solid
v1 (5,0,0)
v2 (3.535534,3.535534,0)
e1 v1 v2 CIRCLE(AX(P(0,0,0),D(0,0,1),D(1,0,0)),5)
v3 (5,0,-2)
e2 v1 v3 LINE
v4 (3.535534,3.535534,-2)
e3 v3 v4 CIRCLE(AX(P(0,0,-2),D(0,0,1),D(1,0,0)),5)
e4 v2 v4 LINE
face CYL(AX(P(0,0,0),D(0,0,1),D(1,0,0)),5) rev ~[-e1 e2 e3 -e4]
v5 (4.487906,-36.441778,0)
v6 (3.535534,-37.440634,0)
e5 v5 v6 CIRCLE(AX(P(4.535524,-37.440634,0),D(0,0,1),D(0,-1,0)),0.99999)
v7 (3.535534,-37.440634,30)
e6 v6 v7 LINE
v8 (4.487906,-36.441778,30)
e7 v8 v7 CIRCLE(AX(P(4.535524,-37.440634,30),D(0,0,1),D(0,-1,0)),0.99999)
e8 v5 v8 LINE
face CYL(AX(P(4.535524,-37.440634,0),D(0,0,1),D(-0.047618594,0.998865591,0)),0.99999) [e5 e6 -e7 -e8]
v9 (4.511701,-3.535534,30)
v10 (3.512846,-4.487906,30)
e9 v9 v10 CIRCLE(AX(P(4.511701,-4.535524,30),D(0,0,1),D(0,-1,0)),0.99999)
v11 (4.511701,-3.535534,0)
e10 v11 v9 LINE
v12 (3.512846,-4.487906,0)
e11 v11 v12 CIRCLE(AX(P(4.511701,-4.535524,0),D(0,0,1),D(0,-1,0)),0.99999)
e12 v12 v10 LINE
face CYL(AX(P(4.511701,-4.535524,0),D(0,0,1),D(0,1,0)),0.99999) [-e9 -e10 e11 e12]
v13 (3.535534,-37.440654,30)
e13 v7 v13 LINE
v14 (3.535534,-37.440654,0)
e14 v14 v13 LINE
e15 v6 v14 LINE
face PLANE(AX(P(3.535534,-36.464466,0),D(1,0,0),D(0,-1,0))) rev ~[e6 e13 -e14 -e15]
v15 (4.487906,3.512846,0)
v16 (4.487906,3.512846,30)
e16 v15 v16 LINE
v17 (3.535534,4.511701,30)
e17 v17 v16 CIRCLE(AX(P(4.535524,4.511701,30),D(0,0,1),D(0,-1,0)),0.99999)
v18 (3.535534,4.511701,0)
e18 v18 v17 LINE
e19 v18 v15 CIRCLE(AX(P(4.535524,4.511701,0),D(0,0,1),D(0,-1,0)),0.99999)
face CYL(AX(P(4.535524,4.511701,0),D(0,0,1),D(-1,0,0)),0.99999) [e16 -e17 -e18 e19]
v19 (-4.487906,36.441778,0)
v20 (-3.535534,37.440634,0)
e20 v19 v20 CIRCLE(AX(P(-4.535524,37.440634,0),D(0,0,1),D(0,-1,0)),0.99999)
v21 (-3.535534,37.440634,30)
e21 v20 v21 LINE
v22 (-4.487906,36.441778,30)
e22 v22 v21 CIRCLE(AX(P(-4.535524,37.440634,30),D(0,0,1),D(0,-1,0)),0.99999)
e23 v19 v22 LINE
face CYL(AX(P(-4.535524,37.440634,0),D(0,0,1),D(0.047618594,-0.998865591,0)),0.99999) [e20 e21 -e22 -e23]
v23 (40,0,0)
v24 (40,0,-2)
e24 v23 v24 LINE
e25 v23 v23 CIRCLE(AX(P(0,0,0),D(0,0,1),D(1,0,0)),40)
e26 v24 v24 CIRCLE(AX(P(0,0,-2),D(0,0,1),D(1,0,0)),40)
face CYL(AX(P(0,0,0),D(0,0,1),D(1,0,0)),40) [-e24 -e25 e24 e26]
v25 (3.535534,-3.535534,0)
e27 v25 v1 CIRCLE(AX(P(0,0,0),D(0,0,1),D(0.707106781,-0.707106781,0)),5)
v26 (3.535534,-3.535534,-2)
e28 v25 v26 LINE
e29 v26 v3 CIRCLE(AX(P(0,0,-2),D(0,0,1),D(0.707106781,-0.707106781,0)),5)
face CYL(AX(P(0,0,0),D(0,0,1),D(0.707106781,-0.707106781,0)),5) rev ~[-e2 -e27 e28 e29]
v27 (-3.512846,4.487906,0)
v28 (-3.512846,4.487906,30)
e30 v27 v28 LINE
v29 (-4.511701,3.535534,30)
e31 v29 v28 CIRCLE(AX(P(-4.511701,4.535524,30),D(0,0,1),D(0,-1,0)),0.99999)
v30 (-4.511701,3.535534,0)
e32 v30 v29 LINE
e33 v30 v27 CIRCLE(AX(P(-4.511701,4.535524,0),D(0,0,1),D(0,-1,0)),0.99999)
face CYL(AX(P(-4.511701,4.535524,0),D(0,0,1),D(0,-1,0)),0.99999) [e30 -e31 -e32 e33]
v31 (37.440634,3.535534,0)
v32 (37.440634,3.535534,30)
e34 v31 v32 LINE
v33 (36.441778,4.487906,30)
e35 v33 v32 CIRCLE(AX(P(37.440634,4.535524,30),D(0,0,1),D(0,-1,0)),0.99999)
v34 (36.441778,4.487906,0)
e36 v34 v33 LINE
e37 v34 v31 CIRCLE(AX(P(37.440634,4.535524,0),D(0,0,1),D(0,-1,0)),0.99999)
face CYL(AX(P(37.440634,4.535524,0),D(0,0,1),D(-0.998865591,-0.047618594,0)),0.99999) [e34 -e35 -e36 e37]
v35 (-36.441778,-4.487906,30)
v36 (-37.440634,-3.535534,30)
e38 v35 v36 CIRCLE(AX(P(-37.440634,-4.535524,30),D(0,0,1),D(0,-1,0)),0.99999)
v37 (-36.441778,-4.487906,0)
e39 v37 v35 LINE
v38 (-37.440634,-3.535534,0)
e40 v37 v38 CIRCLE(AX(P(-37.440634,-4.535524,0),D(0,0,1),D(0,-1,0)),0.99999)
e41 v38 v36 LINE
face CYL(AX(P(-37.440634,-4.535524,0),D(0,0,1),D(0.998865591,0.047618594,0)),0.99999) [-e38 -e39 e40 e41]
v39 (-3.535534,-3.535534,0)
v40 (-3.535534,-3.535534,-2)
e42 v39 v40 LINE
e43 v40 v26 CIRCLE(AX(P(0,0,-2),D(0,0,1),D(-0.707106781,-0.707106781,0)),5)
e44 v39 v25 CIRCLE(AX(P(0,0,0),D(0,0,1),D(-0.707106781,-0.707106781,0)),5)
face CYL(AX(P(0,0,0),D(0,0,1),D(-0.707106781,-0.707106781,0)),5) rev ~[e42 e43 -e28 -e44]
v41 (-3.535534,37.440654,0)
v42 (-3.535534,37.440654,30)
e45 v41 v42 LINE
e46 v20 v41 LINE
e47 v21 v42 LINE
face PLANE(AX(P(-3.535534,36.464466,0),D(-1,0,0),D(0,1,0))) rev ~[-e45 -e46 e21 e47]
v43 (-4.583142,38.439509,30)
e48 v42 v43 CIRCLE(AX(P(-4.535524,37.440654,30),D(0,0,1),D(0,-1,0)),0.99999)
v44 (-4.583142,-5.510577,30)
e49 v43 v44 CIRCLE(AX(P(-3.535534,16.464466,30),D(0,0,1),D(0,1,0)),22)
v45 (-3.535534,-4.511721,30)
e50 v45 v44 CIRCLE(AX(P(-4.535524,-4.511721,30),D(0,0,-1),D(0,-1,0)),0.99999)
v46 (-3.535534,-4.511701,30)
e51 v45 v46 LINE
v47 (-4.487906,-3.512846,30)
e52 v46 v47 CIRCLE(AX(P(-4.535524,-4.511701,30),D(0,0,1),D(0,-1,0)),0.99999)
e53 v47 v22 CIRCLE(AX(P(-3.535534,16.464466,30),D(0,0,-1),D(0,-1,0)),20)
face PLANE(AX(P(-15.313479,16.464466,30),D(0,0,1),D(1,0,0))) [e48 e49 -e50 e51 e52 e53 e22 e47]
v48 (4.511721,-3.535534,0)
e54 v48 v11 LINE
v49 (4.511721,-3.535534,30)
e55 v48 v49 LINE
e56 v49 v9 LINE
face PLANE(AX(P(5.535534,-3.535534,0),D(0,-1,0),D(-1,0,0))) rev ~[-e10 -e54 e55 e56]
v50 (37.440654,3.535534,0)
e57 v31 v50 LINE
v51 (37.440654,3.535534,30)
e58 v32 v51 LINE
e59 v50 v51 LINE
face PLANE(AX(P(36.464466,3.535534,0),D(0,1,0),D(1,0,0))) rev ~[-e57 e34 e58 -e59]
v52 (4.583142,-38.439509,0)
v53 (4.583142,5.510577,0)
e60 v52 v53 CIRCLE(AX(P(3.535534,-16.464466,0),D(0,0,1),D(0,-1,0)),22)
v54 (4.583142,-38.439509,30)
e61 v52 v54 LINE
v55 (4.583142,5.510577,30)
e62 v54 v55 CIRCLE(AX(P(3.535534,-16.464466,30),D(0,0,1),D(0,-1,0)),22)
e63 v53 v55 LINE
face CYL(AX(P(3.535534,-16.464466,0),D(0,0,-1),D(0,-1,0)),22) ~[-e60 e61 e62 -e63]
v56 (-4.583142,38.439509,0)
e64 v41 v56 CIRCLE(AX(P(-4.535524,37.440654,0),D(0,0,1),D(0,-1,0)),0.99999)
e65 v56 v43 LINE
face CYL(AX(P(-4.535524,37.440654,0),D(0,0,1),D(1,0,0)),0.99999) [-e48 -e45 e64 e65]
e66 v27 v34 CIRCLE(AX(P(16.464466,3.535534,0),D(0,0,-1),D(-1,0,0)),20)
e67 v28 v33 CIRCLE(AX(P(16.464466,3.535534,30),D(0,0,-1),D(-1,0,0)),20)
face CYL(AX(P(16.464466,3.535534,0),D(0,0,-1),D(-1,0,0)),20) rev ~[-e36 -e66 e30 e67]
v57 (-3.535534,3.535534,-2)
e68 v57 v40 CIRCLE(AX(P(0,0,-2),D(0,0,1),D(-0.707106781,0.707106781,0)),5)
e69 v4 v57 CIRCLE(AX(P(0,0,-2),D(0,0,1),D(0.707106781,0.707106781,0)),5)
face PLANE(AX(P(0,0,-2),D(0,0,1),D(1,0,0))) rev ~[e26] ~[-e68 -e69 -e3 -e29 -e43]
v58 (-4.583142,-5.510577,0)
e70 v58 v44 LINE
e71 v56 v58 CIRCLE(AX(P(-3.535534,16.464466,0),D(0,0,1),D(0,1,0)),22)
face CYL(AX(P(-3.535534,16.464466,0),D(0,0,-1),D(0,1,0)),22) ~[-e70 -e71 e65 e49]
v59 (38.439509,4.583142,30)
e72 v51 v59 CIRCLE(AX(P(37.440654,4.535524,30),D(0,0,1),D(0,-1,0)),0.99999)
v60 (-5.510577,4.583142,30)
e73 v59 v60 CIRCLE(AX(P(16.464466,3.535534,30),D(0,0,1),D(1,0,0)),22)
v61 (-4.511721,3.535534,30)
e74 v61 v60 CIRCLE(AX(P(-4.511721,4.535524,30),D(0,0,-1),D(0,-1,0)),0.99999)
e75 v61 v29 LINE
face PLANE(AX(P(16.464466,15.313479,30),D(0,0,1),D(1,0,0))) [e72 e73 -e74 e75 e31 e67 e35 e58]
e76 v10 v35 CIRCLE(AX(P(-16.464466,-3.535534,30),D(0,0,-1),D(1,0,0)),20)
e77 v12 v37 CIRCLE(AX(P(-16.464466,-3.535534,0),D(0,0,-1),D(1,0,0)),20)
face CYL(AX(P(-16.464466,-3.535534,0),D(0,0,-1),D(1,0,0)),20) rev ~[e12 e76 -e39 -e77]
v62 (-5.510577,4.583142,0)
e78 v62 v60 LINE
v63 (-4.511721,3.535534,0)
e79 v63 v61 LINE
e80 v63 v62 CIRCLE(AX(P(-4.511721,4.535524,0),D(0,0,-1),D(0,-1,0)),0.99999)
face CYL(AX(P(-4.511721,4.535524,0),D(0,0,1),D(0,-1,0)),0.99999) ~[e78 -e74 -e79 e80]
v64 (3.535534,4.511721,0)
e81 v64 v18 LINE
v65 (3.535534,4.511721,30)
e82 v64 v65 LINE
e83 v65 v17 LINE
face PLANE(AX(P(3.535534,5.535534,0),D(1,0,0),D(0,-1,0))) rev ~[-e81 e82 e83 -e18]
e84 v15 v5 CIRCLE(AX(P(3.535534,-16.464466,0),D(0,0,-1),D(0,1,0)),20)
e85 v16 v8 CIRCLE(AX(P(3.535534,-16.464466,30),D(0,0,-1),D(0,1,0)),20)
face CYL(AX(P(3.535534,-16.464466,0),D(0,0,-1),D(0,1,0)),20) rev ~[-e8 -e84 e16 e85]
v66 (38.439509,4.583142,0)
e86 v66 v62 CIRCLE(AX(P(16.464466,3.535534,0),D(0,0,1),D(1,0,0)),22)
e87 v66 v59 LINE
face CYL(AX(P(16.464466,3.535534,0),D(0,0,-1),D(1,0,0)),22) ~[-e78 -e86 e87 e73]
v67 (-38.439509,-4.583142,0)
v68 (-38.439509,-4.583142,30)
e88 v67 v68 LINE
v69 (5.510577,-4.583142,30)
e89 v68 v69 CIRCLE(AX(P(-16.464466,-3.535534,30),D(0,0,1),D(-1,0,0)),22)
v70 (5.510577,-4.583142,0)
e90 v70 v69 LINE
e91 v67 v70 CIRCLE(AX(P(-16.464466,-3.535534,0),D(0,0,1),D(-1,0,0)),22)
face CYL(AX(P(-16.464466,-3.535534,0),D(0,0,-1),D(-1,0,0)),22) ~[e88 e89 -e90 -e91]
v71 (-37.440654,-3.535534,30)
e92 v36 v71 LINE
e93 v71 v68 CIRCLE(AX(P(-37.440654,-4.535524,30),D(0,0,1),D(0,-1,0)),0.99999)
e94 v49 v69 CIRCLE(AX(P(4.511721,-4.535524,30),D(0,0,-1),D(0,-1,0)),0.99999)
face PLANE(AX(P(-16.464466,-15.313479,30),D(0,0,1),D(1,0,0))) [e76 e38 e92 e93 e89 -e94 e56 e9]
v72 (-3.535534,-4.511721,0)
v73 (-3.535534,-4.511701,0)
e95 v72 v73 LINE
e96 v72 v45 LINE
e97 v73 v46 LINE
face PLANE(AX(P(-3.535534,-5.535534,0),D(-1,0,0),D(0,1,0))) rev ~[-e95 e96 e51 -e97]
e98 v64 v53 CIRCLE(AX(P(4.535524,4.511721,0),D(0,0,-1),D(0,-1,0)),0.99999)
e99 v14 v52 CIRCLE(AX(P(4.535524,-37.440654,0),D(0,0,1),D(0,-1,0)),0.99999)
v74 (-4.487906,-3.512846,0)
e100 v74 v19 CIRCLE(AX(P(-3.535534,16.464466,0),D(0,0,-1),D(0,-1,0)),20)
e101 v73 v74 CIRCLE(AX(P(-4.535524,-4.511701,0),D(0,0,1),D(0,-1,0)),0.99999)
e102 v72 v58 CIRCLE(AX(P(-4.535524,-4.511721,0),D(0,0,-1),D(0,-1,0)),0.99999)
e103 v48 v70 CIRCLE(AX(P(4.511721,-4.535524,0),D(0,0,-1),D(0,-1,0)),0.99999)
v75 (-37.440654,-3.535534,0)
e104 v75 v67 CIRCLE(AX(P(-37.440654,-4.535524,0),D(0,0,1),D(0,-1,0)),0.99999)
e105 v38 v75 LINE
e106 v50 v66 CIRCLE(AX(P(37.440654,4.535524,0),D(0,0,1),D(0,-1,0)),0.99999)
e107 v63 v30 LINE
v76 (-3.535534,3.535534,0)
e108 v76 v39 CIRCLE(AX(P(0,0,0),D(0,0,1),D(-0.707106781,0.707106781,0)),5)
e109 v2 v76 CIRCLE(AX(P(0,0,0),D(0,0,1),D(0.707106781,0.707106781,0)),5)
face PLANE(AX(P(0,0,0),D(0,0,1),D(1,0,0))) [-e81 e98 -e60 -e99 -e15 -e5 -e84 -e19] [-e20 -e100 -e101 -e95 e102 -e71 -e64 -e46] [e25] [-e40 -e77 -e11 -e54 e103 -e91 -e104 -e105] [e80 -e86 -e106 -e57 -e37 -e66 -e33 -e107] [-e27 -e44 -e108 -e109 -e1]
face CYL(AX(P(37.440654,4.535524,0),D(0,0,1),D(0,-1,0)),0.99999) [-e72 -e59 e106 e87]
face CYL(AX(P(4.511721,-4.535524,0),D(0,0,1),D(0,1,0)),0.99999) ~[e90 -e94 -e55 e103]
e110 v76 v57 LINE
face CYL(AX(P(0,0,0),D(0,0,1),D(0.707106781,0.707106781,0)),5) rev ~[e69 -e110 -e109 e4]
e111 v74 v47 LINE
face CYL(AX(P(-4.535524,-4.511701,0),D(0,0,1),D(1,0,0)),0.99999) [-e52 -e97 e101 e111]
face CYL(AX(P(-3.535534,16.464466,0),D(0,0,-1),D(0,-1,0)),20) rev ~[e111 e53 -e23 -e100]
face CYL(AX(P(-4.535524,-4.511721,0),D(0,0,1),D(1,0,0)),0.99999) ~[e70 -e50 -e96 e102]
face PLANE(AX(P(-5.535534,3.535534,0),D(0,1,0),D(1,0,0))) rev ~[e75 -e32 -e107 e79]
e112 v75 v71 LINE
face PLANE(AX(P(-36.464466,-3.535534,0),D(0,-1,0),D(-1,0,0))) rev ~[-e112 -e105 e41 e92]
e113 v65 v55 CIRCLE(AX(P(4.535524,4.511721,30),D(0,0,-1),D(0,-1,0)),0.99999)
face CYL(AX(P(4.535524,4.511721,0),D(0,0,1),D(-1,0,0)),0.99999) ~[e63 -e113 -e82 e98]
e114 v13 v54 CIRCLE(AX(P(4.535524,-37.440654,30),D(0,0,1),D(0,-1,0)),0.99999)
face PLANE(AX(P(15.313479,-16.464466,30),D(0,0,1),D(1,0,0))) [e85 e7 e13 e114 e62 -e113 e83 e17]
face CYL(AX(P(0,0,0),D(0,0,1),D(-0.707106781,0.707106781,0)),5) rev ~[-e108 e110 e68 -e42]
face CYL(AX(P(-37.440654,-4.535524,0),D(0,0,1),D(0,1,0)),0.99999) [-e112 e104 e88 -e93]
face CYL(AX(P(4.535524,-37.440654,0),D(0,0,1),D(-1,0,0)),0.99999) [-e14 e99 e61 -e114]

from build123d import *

# Parameters (mm, degrees)
F1_DEPTH = 30
F2_R     = 0.99999
F2_2_R   = 0.99999
F2_3_R   = 0.99999
F2_4_R   = 0.99999
F3_R     = 40
F4_DEPTH = 2
F5_DEPTH = 25


# Not quite as in the source:
# - a fillet or chamfer is up to 0.001 mm smaller than in the source, because OpenCascade refuses the exact size


with BuildPart() as f1:
    # F0 (on Top) → F1 (new body)
    with BuildSketch(Plane.XY):
        with BuildLine():
            Line((-5.5355339059, 3.5355339059), (-3.5355339059, 3.5355339059))
            ThreePointArc((-3.5355339059, 3.5355339059), (16.4644660941, 23.5355339059), (36.4644660941, 3.5355339059))
            Line((36.4644660941, 3.5355339059), (38.4644660941, 3.5355339059))
            ThreePointArc((38.4644660941, 3.5355339059), (16.4644660941, 25.5355339059), (-5.5355339059, 3.5355339059))
        make_face()
    extrude(amount=F1_DEPTH)

    # F2 (radius 1 in the source; OpenCascade refuses exactly that, so slightly less here)
    f2_edges = [f1.edges().sort_by_distance(p)[0] for p in [
        (-3.535534, 3.535534, 15),
        (-5.535534, 3.535534, 15),
        (38.464466, 3.535534, 15),
        (36.464466, 3.535534, 15),
    ]]
    fillet(f2_edges, radius=F2_R)



with BuildPart() as f1b:
    # F0 (on Top) → F1, piece 2 (new body)
    with BuildSketch(Plane.XY):
        with BuildLine():
            Line((3.5355339059, 5.5355339059), (3.5355339059, 3.5355339059))
            ThreePointArc((3.5355339059, 3.5355339059), (23.5355339059, -16.4644660941), (3.5355339059, -36.4644660941))
            Line((3.5355339059, -36.4644660941), (3.5355339059, -38.4644660941))
            ThreePointArc((3.5355339059, -38.4644660941), (25.5355339059, -16.4644660941), (3.5355339059, 5.5355339059))
        make_face()
    extrude(amount=F1_DEPTH)

    # F2#2 (radius 1 in the source; OpenCascade refuses exactly that, so slightly less here)
    f2_2_edges = [f1b.edges().sort_by_distance(p)[0] for p in [
        (3.535534, 3.535534, 15),
        (3.535534, 5.535534, 15),
        (3.535534, -38.464466, 15),
        (3.535534, -36.464466, 15),
    ]]
    fillet(f2_2_edges, radius=F2_2_R)


with BuildPart() as f1c:
    # F0 (on Top) → F1, piece 3 (new body)
    with BuildSketch(Plane.XY):
        with BuildLine():
            Line((-3.5355339059, -5.5355339059), (-3.5355339059, -3.5355339059))
            ThreePointArc((-3.5355339059, -3.5355339059), (-23.5355339059, 16.4644660941), (-3.5355339059, 36.4644660941))
            Line((-3.5355339059, 36.4644660941), (-3.5355339059, 38.4644660941))
            ThreePointArc((-3.5355339059, 38.4644660941), (-25.5355339059, 16.4644660941), (-3.5355339059, -5.5355339059))
        make_face()
    extrude(amount=F1_DEPTH)

    # F2#4 (radius 1 in the source; OpenCascade refuses exactly that, so slightly less here)
    f2_4_edges = [f1c.edges().sort_by_distance(p)[0] for p in [
        (-3.535534, -3.535534, 15),
        (-3.535534, -5.535534, 15),
        (-3.535534, 38.464466, 15),
        (-3.535534, 36.464466, 15),
    ]]
    fillet(f2_4_edges, radius=F2_4_R)


with BuildPart() as f1d:
    # F0 (on Top) → F1, piece 4 (new body)
    with BuildSketch(Plane.XY):
        with BuildLine():
            Line((5.5355339059, -3.5355339059), (3.5355339059, -3.5355339059))
            ThreePointArc((3.5355339059, -3.5355339059), (-16.4644660941, -23.5355339059), (-36.4644660941, -3.5355339059))
            Line((-36.4644660941, -3.5355339059), (-38.4644660941, -3.5355339059))
            ThreePointArc((-38.4644660941, -3.5355339059), (-16.4644660941, -25.5355339059), (5.5355339059, -3.5355339059))
        make_face()
    extrude(amount=F1_DEPTH)

    # F2#3 (radius 1 in the source; OpenCascade refuses exactly that, so slightly less here)
    f2_3_edges = [f1d.edges().sort_by_distance(p)[0] for p in [
        (3.535534, -3.535534, 15),
        (5.535534, -3.535534, 15),
        (-38.464466, -3.535534, 15),
        (-36.464466, -3.535534, 15),
    ]]
    fillet(f2_3_edges, radius=F2_3_R)


with BuildPart() as f1_1:
    add(f1.part)

    add(f1b.part)  # F4 merges F1b

    add(f1c.part)  # F4 merges F1c

    add(f1d.part)  # F4 merges F1d
    # F3 (on Top) → F4 (join)
    with BuildSketch(Plane.XY):
        Circle(F3_R)
    extrude(amount=-F4_DEPTH)

    # F0 (on Top) → F5 (cut)
    with BuildSketch(Plane.XY):
        Polygon((-3.5355339059, -3.5355339059), (3.5355339059, -3.5355339059), (0, 0), align=None)
        with BuildLine():
            ThreePointArc((-3.5355339059, -3.5355339059), (0, -5), (3.5355339059, -3.5355339059))
            Line((3.5355339059, -3.5355339059), (-3.5355339059, -3.5355339059))
        make_face()
        Polygon((0, 0), (-3.5355339059, 3.5355339059), (-3.5355339059, -3.5355339059), align=None)
        with BuildLine():
            Line((-3.5355339059, -3.5355339059), (-3.5355339059, 3.5355339059))
            ThreePointArc((-3.5355339059, 3.5355339059), (-5, 0), (-3.5355339059, -3.5355339059))
        make_face()
        Polygon((0, 0), (3.5355339059, 3.5355339059), (-3.5355339059, 3.5355339059), align=None)
        with BuildLine():
            Line((-3.5355339059, 3.5355339059), (3.5355339059, 3.5355339059))
            ThreePointArc((3.5355339059, 3.5355339059), (0, 5), (-3.5355339059, 3.5355339059))
        make_face()
        Polygon((3.5355339059, -3.5355339059), (3.5355339059, 3.5355339059), (0, 0), align=None)
        with BuildLine():
            ThreePointArc((3.5355339059, -3.5355339059), (4.6193976626, -1.9134171618), (5, 0))
            ThreePointArc((5, 0), (4.6193976626, 1.9134171618), (3.5355339059, 3.5355339059))
            Line((3.5355339059, 3.5355339059), (3.5355339059, -3.5355339059))
        make_face()
    extrude(amount=-F5_DEPTH, mode=Mode.SUBTRACT)


solid = f1_1.part
